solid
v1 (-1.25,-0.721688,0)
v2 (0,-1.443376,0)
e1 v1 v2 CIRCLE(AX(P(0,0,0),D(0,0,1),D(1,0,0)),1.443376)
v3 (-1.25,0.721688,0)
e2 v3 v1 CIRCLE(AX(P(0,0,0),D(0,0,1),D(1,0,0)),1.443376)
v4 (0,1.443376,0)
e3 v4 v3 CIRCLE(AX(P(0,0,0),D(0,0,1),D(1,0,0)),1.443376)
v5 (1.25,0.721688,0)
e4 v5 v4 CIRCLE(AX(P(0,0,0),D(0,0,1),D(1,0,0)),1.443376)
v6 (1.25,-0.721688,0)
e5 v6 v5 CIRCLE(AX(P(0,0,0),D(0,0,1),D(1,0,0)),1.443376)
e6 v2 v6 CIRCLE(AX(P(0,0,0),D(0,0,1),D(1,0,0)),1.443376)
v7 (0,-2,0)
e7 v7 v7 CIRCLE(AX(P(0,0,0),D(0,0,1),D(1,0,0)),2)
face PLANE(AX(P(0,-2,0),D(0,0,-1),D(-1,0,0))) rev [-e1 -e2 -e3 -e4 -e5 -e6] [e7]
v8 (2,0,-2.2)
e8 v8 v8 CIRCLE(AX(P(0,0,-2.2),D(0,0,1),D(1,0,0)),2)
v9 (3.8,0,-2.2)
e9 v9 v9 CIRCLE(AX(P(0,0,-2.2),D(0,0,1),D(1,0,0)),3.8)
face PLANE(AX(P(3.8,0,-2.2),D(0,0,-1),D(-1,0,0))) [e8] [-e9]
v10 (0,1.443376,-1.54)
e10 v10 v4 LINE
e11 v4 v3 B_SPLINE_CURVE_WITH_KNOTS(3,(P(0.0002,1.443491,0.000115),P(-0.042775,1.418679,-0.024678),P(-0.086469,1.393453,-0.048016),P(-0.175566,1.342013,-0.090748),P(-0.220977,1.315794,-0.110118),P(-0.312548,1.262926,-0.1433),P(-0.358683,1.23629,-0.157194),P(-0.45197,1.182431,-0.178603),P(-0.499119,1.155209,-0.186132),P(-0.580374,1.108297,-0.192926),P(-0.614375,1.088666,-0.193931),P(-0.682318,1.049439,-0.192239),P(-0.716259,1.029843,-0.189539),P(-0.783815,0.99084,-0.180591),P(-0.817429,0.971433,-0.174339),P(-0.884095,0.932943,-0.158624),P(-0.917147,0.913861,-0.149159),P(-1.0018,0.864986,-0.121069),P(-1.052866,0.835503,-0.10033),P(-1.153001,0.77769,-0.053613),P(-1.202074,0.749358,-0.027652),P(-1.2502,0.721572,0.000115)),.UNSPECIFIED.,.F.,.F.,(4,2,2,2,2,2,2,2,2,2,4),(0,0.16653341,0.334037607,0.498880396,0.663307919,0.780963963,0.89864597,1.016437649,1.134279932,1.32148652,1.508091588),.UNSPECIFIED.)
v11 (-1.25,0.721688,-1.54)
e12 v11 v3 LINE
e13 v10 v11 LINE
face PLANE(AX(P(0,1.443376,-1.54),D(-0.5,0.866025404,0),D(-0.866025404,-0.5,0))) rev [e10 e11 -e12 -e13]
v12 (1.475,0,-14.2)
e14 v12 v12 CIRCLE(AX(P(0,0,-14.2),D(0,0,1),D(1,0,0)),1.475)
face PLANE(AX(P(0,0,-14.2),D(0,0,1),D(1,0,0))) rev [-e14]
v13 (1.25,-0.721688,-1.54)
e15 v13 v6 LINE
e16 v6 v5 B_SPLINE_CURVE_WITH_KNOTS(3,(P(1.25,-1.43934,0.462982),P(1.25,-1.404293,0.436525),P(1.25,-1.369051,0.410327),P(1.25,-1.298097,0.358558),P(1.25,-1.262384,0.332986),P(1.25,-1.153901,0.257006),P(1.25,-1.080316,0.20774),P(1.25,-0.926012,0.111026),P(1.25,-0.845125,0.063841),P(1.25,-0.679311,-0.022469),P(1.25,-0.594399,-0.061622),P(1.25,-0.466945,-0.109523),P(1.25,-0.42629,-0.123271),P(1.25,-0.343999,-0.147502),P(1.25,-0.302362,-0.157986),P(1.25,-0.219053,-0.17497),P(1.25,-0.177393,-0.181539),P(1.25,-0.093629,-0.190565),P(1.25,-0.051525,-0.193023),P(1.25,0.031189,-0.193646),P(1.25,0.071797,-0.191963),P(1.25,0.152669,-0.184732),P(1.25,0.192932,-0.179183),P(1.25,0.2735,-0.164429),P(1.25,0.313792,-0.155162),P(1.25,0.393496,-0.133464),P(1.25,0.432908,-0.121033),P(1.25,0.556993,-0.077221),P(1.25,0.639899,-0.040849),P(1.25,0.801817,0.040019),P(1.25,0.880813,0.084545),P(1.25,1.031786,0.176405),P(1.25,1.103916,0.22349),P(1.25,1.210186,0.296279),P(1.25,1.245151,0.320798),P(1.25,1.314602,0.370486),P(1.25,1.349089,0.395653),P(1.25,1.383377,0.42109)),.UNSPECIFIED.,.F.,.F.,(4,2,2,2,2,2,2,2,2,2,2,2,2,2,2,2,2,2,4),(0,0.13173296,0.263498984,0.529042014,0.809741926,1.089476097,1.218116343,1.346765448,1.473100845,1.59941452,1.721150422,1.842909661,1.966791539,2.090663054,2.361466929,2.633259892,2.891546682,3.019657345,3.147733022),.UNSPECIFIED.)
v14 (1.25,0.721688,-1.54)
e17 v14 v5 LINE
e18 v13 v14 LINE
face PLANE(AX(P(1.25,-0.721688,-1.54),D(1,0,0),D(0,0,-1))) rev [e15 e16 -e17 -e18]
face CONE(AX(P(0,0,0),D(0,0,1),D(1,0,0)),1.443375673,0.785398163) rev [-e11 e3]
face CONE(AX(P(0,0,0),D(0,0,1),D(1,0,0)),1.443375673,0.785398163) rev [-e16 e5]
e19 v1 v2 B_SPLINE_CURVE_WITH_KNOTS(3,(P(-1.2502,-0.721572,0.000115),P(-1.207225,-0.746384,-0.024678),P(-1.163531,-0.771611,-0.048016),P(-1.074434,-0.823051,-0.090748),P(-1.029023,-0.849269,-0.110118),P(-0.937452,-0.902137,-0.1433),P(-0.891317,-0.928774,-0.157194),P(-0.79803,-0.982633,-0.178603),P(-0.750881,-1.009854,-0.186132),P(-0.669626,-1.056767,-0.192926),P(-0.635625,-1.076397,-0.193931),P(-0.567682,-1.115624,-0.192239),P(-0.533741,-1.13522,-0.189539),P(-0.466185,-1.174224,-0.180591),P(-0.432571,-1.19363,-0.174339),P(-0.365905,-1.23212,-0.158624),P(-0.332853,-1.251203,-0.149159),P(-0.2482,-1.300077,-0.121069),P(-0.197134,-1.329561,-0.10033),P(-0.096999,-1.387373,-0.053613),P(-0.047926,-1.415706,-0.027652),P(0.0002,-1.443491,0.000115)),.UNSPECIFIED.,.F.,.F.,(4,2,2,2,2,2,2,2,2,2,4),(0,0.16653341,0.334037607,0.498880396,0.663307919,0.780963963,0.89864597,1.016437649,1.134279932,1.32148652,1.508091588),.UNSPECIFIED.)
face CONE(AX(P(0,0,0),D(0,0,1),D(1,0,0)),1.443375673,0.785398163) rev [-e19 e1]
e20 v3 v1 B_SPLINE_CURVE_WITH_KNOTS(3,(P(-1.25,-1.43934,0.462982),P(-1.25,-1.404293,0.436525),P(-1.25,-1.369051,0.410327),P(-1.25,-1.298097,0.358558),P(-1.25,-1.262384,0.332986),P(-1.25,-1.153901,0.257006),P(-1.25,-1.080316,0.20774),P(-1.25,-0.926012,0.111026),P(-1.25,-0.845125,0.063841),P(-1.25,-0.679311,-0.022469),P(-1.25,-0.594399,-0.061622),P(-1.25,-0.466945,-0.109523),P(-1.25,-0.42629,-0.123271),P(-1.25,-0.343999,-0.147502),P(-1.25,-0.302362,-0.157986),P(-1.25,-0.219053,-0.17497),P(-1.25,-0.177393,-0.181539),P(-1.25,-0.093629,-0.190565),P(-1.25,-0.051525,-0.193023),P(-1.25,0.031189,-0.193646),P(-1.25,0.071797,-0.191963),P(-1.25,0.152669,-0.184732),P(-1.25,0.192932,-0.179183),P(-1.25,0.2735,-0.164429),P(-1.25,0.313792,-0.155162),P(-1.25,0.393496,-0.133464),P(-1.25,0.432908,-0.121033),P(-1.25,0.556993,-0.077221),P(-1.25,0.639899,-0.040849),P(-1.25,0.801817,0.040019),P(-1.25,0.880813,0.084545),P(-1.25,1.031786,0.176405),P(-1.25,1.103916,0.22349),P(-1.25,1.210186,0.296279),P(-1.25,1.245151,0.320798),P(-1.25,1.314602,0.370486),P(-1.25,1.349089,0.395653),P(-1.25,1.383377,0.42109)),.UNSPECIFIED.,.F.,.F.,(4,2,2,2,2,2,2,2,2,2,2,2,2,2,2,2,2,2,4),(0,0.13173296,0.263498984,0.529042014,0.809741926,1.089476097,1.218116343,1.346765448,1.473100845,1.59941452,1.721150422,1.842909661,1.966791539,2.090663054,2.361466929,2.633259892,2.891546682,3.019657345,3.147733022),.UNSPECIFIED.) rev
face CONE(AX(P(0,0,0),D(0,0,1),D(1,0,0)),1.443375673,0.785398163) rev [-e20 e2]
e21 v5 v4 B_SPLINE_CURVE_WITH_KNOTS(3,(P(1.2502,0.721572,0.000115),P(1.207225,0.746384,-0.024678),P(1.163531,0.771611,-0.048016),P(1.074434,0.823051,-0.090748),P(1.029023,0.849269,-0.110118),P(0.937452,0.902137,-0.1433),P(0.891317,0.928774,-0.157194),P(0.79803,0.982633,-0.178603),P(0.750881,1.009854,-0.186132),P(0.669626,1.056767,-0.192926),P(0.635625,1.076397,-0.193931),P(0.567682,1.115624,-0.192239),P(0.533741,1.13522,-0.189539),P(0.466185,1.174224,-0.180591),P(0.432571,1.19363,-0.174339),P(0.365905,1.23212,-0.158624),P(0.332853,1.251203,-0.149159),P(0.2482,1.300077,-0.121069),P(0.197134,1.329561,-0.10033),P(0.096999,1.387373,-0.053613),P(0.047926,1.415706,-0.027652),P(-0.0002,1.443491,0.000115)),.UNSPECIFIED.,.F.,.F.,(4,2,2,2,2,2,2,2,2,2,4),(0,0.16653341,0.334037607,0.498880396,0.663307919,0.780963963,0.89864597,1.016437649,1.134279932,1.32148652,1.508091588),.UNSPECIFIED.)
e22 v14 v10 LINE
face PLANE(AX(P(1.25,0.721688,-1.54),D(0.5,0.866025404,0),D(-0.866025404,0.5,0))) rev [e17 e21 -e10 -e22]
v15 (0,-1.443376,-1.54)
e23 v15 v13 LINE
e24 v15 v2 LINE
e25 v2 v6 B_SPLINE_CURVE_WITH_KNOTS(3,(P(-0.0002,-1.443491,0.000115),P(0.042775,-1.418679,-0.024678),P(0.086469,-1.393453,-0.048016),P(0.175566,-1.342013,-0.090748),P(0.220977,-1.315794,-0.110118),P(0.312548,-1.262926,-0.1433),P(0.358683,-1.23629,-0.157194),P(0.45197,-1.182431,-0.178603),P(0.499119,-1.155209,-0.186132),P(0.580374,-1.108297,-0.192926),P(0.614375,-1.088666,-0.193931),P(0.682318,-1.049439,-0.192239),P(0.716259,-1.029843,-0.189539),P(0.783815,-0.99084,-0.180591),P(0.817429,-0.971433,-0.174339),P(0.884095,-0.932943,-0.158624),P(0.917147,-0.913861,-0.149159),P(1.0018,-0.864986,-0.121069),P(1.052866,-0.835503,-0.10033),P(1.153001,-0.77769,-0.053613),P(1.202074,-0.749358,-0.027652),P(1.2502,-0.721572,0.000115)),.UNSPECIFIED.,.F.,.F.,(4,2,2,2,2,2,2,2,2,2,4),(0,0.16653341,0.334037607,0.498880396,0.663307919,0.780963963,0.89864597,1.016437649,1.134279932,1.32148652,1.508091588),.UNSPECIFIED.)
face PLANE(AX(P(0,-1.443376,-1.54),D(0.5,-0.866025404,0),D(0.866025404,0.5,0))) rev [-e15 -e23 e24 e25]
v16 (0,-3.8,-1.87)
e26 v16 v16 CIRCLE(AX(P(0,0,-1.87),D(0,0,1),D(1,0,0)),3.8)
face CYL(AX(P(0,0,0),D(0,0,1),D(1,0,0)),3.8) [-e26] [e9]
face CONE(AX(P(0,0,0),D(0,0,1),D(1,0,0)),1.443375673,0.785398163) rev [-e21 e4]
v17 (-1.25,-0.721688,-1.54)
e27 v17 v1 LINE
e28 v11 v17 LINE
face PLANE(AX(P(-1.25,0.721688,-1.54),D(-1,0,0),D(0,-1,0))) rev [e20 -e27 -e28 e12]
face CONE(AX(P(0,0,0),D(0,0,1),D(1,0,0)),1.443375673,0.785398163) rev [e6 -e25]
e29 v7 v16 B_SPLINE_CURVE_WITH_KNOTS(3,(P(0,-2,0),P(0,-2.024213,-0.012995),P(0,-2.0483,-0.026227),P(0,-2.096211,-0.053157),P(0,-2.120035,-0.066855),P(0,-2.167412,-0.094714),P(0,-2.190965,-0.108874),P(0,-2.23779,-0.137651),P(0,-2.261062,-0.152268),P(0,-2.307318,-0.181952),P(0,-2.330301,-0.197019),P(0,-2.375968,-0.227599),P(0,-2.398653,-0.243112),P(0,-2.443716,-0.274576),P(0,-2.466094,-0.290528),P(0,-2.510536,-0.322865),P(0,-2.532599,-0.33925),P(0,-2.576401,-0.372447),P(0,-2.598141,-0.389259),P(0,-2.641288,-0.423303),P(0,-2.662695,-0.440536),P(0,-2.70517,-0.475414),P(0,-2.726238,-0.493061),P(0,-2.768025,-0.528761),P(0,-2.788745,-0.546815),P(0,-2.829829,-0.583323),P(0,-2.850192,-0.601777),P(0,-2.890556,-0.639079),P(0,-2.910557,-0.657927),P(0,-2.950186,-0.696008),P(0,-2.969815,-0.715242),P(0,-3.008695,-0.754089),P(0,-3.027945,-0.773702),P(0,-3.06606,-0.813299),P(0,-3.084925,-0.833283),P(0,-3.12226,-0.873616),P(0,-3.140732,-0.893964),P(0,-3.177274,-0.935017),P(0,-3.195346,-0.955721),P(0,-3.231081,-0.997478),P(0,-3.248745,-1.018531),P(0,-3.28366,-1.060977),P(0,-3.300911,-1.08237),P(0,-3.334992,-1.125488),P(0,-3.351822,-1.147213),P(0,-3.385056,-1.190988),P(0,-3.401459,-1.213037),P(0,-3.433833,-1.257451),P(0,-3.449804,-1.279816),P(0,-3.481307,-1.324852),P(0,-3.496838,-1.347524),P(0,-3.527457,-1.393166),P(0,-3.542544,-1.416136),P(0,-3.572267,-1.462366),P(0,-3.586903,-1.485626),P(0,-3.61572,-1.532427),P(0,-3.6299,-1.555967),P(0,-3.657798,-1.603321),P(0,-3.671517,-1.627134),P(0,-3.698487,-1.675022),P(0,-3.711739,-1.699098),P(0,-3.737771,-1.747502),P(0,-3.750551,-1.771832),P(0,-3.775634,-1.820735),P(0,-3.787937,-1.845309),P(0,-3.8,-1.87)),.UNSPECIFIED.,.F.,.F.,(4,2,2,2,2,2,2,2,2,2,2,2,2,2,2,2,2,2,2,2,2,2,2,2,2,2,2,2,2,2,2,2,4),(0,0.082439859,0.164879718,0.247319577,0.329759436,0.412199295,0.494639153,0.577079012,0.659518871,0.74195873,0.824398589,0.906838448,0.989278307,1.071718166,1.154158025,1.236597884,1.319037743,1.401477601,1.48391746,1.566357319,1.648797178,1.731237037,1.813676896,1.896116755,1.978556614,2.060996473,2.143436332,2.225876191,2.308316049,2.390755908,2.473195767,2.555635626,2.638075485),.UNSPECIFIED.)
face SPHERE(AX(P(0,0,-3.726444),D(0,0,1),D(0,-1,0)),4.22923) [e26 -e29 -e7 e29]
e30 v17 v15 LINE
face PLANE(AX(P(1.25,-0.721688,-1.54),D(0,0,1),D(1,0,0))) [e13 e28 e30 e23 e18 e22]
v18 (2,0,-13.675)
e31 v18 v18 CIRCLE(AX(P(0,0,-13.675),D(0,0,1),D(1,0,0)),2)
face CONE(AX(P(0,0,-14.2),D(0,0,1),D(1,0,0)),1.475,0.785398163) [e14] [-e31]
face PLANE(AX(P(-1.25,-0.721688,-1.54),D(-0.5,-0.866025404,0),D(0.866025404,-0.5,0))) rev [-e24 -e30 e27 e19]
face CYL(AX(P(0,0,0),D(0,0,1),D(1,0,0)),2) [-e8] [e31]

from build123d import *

# Parameters (mm, degrees)
CUT_EXTRUDE2_DEPTH = 1.54


with BuildPart() as part:
    # Sketch10 → Revolve3 (revolve)
    with BuildSketch(Plane(origin=(0, 0, 0), x_dir=(0, 0, -1), z_dir=(1, 0, 0)), mode=Mode.PRIVATE) as revolve3_sk:
        Polygon((13.675, 2), (14.2, 1.475), (14.2, 0), (2.2, 0), (2.2, 2), align=None)
    revolve(revolve3_sk.sketch.rotate(Axis((0, 0, 0), (0, 0, -1)), 90), axis=Axis((0, 0, 0), (0, 0, -1)))

    # Sketch7 → Revolve2 (revolve)
    with BuildSketch(Plane(origin=(0, 0, 0), x_dir=(0, 0, -1), z_dir=(1, 0, 0)), mode=Mode.PRIVATE) as revolve2_sk:
        with BuildLine():
            Line((1.87, 3.8), (2.2, 3.8))
            Line((2.2, 3.8), (2.2, 0))
            Line((2.2, 0), (0, 0))
            Line((0, 0), (0, 2))
            ThreePointArc((0, 2), (0.793500147, 3.047002626), (1.87, 3.8))
        make_face()
    revolve(revolve2_sk.sketch.rotate(Axis((0, 0, 0), (0, 0, -1)), 180), axis=Axis((0, 0, 0), (0, 0, -1)))

    # Sketch5 → Cut-Extrude2 (cut)
    with BuildSketch(Plane.XY):
        Polygon((1.25, -0.721687836), (1.25, 0.721687836), (0, 1.443375673), (-1.25, 0.721687836), (-1.25, -0.721687836), (0, -1.443375673), align=None)
    extrude(amount=-CUT_EXTRUDE2_DEPTH, mode=Mode.SUBTRACT)

    # Cut-Extrude3 cone 1 section (through the dimple's axis) → Cut-Extrude3 (revolve, cut)
    with BuildSketch(Plane(origin=(0, 0, 0), x_dir=(0, -1, 0), z_dir=(1, 0, 0))):
        Polygon((0, 0), (1.443375673, 0), (0, 1.443375673), align=None)
    revolve(axis=Axis((0, 0, 0), (0, 0, -1)), mode=Mode.SUBTRACT)


with BuildPart() as body_2:
    # Split1: read off the stored shape, not the designer's step
    # Split1: the piece on the far side of the plane
    add(part.part)
    split(bisect_by=Plane.XY.offset(-2.2), keep=Keep.BOTTOM)


with BuildPart() as part_1:
    add(part.part)

    # Split1
    split(bisect_by=Plane.XY.offset(-2.2), keep=Keep.TOP)


with BuildPart() as body_2_1:
    add(body_2.part)

    # Boss-Extrude1: read off the stored shape, not the designer's step
    # Boss-Extrude1: union part
    add(part_1.part)


solid = body_2_1.part
